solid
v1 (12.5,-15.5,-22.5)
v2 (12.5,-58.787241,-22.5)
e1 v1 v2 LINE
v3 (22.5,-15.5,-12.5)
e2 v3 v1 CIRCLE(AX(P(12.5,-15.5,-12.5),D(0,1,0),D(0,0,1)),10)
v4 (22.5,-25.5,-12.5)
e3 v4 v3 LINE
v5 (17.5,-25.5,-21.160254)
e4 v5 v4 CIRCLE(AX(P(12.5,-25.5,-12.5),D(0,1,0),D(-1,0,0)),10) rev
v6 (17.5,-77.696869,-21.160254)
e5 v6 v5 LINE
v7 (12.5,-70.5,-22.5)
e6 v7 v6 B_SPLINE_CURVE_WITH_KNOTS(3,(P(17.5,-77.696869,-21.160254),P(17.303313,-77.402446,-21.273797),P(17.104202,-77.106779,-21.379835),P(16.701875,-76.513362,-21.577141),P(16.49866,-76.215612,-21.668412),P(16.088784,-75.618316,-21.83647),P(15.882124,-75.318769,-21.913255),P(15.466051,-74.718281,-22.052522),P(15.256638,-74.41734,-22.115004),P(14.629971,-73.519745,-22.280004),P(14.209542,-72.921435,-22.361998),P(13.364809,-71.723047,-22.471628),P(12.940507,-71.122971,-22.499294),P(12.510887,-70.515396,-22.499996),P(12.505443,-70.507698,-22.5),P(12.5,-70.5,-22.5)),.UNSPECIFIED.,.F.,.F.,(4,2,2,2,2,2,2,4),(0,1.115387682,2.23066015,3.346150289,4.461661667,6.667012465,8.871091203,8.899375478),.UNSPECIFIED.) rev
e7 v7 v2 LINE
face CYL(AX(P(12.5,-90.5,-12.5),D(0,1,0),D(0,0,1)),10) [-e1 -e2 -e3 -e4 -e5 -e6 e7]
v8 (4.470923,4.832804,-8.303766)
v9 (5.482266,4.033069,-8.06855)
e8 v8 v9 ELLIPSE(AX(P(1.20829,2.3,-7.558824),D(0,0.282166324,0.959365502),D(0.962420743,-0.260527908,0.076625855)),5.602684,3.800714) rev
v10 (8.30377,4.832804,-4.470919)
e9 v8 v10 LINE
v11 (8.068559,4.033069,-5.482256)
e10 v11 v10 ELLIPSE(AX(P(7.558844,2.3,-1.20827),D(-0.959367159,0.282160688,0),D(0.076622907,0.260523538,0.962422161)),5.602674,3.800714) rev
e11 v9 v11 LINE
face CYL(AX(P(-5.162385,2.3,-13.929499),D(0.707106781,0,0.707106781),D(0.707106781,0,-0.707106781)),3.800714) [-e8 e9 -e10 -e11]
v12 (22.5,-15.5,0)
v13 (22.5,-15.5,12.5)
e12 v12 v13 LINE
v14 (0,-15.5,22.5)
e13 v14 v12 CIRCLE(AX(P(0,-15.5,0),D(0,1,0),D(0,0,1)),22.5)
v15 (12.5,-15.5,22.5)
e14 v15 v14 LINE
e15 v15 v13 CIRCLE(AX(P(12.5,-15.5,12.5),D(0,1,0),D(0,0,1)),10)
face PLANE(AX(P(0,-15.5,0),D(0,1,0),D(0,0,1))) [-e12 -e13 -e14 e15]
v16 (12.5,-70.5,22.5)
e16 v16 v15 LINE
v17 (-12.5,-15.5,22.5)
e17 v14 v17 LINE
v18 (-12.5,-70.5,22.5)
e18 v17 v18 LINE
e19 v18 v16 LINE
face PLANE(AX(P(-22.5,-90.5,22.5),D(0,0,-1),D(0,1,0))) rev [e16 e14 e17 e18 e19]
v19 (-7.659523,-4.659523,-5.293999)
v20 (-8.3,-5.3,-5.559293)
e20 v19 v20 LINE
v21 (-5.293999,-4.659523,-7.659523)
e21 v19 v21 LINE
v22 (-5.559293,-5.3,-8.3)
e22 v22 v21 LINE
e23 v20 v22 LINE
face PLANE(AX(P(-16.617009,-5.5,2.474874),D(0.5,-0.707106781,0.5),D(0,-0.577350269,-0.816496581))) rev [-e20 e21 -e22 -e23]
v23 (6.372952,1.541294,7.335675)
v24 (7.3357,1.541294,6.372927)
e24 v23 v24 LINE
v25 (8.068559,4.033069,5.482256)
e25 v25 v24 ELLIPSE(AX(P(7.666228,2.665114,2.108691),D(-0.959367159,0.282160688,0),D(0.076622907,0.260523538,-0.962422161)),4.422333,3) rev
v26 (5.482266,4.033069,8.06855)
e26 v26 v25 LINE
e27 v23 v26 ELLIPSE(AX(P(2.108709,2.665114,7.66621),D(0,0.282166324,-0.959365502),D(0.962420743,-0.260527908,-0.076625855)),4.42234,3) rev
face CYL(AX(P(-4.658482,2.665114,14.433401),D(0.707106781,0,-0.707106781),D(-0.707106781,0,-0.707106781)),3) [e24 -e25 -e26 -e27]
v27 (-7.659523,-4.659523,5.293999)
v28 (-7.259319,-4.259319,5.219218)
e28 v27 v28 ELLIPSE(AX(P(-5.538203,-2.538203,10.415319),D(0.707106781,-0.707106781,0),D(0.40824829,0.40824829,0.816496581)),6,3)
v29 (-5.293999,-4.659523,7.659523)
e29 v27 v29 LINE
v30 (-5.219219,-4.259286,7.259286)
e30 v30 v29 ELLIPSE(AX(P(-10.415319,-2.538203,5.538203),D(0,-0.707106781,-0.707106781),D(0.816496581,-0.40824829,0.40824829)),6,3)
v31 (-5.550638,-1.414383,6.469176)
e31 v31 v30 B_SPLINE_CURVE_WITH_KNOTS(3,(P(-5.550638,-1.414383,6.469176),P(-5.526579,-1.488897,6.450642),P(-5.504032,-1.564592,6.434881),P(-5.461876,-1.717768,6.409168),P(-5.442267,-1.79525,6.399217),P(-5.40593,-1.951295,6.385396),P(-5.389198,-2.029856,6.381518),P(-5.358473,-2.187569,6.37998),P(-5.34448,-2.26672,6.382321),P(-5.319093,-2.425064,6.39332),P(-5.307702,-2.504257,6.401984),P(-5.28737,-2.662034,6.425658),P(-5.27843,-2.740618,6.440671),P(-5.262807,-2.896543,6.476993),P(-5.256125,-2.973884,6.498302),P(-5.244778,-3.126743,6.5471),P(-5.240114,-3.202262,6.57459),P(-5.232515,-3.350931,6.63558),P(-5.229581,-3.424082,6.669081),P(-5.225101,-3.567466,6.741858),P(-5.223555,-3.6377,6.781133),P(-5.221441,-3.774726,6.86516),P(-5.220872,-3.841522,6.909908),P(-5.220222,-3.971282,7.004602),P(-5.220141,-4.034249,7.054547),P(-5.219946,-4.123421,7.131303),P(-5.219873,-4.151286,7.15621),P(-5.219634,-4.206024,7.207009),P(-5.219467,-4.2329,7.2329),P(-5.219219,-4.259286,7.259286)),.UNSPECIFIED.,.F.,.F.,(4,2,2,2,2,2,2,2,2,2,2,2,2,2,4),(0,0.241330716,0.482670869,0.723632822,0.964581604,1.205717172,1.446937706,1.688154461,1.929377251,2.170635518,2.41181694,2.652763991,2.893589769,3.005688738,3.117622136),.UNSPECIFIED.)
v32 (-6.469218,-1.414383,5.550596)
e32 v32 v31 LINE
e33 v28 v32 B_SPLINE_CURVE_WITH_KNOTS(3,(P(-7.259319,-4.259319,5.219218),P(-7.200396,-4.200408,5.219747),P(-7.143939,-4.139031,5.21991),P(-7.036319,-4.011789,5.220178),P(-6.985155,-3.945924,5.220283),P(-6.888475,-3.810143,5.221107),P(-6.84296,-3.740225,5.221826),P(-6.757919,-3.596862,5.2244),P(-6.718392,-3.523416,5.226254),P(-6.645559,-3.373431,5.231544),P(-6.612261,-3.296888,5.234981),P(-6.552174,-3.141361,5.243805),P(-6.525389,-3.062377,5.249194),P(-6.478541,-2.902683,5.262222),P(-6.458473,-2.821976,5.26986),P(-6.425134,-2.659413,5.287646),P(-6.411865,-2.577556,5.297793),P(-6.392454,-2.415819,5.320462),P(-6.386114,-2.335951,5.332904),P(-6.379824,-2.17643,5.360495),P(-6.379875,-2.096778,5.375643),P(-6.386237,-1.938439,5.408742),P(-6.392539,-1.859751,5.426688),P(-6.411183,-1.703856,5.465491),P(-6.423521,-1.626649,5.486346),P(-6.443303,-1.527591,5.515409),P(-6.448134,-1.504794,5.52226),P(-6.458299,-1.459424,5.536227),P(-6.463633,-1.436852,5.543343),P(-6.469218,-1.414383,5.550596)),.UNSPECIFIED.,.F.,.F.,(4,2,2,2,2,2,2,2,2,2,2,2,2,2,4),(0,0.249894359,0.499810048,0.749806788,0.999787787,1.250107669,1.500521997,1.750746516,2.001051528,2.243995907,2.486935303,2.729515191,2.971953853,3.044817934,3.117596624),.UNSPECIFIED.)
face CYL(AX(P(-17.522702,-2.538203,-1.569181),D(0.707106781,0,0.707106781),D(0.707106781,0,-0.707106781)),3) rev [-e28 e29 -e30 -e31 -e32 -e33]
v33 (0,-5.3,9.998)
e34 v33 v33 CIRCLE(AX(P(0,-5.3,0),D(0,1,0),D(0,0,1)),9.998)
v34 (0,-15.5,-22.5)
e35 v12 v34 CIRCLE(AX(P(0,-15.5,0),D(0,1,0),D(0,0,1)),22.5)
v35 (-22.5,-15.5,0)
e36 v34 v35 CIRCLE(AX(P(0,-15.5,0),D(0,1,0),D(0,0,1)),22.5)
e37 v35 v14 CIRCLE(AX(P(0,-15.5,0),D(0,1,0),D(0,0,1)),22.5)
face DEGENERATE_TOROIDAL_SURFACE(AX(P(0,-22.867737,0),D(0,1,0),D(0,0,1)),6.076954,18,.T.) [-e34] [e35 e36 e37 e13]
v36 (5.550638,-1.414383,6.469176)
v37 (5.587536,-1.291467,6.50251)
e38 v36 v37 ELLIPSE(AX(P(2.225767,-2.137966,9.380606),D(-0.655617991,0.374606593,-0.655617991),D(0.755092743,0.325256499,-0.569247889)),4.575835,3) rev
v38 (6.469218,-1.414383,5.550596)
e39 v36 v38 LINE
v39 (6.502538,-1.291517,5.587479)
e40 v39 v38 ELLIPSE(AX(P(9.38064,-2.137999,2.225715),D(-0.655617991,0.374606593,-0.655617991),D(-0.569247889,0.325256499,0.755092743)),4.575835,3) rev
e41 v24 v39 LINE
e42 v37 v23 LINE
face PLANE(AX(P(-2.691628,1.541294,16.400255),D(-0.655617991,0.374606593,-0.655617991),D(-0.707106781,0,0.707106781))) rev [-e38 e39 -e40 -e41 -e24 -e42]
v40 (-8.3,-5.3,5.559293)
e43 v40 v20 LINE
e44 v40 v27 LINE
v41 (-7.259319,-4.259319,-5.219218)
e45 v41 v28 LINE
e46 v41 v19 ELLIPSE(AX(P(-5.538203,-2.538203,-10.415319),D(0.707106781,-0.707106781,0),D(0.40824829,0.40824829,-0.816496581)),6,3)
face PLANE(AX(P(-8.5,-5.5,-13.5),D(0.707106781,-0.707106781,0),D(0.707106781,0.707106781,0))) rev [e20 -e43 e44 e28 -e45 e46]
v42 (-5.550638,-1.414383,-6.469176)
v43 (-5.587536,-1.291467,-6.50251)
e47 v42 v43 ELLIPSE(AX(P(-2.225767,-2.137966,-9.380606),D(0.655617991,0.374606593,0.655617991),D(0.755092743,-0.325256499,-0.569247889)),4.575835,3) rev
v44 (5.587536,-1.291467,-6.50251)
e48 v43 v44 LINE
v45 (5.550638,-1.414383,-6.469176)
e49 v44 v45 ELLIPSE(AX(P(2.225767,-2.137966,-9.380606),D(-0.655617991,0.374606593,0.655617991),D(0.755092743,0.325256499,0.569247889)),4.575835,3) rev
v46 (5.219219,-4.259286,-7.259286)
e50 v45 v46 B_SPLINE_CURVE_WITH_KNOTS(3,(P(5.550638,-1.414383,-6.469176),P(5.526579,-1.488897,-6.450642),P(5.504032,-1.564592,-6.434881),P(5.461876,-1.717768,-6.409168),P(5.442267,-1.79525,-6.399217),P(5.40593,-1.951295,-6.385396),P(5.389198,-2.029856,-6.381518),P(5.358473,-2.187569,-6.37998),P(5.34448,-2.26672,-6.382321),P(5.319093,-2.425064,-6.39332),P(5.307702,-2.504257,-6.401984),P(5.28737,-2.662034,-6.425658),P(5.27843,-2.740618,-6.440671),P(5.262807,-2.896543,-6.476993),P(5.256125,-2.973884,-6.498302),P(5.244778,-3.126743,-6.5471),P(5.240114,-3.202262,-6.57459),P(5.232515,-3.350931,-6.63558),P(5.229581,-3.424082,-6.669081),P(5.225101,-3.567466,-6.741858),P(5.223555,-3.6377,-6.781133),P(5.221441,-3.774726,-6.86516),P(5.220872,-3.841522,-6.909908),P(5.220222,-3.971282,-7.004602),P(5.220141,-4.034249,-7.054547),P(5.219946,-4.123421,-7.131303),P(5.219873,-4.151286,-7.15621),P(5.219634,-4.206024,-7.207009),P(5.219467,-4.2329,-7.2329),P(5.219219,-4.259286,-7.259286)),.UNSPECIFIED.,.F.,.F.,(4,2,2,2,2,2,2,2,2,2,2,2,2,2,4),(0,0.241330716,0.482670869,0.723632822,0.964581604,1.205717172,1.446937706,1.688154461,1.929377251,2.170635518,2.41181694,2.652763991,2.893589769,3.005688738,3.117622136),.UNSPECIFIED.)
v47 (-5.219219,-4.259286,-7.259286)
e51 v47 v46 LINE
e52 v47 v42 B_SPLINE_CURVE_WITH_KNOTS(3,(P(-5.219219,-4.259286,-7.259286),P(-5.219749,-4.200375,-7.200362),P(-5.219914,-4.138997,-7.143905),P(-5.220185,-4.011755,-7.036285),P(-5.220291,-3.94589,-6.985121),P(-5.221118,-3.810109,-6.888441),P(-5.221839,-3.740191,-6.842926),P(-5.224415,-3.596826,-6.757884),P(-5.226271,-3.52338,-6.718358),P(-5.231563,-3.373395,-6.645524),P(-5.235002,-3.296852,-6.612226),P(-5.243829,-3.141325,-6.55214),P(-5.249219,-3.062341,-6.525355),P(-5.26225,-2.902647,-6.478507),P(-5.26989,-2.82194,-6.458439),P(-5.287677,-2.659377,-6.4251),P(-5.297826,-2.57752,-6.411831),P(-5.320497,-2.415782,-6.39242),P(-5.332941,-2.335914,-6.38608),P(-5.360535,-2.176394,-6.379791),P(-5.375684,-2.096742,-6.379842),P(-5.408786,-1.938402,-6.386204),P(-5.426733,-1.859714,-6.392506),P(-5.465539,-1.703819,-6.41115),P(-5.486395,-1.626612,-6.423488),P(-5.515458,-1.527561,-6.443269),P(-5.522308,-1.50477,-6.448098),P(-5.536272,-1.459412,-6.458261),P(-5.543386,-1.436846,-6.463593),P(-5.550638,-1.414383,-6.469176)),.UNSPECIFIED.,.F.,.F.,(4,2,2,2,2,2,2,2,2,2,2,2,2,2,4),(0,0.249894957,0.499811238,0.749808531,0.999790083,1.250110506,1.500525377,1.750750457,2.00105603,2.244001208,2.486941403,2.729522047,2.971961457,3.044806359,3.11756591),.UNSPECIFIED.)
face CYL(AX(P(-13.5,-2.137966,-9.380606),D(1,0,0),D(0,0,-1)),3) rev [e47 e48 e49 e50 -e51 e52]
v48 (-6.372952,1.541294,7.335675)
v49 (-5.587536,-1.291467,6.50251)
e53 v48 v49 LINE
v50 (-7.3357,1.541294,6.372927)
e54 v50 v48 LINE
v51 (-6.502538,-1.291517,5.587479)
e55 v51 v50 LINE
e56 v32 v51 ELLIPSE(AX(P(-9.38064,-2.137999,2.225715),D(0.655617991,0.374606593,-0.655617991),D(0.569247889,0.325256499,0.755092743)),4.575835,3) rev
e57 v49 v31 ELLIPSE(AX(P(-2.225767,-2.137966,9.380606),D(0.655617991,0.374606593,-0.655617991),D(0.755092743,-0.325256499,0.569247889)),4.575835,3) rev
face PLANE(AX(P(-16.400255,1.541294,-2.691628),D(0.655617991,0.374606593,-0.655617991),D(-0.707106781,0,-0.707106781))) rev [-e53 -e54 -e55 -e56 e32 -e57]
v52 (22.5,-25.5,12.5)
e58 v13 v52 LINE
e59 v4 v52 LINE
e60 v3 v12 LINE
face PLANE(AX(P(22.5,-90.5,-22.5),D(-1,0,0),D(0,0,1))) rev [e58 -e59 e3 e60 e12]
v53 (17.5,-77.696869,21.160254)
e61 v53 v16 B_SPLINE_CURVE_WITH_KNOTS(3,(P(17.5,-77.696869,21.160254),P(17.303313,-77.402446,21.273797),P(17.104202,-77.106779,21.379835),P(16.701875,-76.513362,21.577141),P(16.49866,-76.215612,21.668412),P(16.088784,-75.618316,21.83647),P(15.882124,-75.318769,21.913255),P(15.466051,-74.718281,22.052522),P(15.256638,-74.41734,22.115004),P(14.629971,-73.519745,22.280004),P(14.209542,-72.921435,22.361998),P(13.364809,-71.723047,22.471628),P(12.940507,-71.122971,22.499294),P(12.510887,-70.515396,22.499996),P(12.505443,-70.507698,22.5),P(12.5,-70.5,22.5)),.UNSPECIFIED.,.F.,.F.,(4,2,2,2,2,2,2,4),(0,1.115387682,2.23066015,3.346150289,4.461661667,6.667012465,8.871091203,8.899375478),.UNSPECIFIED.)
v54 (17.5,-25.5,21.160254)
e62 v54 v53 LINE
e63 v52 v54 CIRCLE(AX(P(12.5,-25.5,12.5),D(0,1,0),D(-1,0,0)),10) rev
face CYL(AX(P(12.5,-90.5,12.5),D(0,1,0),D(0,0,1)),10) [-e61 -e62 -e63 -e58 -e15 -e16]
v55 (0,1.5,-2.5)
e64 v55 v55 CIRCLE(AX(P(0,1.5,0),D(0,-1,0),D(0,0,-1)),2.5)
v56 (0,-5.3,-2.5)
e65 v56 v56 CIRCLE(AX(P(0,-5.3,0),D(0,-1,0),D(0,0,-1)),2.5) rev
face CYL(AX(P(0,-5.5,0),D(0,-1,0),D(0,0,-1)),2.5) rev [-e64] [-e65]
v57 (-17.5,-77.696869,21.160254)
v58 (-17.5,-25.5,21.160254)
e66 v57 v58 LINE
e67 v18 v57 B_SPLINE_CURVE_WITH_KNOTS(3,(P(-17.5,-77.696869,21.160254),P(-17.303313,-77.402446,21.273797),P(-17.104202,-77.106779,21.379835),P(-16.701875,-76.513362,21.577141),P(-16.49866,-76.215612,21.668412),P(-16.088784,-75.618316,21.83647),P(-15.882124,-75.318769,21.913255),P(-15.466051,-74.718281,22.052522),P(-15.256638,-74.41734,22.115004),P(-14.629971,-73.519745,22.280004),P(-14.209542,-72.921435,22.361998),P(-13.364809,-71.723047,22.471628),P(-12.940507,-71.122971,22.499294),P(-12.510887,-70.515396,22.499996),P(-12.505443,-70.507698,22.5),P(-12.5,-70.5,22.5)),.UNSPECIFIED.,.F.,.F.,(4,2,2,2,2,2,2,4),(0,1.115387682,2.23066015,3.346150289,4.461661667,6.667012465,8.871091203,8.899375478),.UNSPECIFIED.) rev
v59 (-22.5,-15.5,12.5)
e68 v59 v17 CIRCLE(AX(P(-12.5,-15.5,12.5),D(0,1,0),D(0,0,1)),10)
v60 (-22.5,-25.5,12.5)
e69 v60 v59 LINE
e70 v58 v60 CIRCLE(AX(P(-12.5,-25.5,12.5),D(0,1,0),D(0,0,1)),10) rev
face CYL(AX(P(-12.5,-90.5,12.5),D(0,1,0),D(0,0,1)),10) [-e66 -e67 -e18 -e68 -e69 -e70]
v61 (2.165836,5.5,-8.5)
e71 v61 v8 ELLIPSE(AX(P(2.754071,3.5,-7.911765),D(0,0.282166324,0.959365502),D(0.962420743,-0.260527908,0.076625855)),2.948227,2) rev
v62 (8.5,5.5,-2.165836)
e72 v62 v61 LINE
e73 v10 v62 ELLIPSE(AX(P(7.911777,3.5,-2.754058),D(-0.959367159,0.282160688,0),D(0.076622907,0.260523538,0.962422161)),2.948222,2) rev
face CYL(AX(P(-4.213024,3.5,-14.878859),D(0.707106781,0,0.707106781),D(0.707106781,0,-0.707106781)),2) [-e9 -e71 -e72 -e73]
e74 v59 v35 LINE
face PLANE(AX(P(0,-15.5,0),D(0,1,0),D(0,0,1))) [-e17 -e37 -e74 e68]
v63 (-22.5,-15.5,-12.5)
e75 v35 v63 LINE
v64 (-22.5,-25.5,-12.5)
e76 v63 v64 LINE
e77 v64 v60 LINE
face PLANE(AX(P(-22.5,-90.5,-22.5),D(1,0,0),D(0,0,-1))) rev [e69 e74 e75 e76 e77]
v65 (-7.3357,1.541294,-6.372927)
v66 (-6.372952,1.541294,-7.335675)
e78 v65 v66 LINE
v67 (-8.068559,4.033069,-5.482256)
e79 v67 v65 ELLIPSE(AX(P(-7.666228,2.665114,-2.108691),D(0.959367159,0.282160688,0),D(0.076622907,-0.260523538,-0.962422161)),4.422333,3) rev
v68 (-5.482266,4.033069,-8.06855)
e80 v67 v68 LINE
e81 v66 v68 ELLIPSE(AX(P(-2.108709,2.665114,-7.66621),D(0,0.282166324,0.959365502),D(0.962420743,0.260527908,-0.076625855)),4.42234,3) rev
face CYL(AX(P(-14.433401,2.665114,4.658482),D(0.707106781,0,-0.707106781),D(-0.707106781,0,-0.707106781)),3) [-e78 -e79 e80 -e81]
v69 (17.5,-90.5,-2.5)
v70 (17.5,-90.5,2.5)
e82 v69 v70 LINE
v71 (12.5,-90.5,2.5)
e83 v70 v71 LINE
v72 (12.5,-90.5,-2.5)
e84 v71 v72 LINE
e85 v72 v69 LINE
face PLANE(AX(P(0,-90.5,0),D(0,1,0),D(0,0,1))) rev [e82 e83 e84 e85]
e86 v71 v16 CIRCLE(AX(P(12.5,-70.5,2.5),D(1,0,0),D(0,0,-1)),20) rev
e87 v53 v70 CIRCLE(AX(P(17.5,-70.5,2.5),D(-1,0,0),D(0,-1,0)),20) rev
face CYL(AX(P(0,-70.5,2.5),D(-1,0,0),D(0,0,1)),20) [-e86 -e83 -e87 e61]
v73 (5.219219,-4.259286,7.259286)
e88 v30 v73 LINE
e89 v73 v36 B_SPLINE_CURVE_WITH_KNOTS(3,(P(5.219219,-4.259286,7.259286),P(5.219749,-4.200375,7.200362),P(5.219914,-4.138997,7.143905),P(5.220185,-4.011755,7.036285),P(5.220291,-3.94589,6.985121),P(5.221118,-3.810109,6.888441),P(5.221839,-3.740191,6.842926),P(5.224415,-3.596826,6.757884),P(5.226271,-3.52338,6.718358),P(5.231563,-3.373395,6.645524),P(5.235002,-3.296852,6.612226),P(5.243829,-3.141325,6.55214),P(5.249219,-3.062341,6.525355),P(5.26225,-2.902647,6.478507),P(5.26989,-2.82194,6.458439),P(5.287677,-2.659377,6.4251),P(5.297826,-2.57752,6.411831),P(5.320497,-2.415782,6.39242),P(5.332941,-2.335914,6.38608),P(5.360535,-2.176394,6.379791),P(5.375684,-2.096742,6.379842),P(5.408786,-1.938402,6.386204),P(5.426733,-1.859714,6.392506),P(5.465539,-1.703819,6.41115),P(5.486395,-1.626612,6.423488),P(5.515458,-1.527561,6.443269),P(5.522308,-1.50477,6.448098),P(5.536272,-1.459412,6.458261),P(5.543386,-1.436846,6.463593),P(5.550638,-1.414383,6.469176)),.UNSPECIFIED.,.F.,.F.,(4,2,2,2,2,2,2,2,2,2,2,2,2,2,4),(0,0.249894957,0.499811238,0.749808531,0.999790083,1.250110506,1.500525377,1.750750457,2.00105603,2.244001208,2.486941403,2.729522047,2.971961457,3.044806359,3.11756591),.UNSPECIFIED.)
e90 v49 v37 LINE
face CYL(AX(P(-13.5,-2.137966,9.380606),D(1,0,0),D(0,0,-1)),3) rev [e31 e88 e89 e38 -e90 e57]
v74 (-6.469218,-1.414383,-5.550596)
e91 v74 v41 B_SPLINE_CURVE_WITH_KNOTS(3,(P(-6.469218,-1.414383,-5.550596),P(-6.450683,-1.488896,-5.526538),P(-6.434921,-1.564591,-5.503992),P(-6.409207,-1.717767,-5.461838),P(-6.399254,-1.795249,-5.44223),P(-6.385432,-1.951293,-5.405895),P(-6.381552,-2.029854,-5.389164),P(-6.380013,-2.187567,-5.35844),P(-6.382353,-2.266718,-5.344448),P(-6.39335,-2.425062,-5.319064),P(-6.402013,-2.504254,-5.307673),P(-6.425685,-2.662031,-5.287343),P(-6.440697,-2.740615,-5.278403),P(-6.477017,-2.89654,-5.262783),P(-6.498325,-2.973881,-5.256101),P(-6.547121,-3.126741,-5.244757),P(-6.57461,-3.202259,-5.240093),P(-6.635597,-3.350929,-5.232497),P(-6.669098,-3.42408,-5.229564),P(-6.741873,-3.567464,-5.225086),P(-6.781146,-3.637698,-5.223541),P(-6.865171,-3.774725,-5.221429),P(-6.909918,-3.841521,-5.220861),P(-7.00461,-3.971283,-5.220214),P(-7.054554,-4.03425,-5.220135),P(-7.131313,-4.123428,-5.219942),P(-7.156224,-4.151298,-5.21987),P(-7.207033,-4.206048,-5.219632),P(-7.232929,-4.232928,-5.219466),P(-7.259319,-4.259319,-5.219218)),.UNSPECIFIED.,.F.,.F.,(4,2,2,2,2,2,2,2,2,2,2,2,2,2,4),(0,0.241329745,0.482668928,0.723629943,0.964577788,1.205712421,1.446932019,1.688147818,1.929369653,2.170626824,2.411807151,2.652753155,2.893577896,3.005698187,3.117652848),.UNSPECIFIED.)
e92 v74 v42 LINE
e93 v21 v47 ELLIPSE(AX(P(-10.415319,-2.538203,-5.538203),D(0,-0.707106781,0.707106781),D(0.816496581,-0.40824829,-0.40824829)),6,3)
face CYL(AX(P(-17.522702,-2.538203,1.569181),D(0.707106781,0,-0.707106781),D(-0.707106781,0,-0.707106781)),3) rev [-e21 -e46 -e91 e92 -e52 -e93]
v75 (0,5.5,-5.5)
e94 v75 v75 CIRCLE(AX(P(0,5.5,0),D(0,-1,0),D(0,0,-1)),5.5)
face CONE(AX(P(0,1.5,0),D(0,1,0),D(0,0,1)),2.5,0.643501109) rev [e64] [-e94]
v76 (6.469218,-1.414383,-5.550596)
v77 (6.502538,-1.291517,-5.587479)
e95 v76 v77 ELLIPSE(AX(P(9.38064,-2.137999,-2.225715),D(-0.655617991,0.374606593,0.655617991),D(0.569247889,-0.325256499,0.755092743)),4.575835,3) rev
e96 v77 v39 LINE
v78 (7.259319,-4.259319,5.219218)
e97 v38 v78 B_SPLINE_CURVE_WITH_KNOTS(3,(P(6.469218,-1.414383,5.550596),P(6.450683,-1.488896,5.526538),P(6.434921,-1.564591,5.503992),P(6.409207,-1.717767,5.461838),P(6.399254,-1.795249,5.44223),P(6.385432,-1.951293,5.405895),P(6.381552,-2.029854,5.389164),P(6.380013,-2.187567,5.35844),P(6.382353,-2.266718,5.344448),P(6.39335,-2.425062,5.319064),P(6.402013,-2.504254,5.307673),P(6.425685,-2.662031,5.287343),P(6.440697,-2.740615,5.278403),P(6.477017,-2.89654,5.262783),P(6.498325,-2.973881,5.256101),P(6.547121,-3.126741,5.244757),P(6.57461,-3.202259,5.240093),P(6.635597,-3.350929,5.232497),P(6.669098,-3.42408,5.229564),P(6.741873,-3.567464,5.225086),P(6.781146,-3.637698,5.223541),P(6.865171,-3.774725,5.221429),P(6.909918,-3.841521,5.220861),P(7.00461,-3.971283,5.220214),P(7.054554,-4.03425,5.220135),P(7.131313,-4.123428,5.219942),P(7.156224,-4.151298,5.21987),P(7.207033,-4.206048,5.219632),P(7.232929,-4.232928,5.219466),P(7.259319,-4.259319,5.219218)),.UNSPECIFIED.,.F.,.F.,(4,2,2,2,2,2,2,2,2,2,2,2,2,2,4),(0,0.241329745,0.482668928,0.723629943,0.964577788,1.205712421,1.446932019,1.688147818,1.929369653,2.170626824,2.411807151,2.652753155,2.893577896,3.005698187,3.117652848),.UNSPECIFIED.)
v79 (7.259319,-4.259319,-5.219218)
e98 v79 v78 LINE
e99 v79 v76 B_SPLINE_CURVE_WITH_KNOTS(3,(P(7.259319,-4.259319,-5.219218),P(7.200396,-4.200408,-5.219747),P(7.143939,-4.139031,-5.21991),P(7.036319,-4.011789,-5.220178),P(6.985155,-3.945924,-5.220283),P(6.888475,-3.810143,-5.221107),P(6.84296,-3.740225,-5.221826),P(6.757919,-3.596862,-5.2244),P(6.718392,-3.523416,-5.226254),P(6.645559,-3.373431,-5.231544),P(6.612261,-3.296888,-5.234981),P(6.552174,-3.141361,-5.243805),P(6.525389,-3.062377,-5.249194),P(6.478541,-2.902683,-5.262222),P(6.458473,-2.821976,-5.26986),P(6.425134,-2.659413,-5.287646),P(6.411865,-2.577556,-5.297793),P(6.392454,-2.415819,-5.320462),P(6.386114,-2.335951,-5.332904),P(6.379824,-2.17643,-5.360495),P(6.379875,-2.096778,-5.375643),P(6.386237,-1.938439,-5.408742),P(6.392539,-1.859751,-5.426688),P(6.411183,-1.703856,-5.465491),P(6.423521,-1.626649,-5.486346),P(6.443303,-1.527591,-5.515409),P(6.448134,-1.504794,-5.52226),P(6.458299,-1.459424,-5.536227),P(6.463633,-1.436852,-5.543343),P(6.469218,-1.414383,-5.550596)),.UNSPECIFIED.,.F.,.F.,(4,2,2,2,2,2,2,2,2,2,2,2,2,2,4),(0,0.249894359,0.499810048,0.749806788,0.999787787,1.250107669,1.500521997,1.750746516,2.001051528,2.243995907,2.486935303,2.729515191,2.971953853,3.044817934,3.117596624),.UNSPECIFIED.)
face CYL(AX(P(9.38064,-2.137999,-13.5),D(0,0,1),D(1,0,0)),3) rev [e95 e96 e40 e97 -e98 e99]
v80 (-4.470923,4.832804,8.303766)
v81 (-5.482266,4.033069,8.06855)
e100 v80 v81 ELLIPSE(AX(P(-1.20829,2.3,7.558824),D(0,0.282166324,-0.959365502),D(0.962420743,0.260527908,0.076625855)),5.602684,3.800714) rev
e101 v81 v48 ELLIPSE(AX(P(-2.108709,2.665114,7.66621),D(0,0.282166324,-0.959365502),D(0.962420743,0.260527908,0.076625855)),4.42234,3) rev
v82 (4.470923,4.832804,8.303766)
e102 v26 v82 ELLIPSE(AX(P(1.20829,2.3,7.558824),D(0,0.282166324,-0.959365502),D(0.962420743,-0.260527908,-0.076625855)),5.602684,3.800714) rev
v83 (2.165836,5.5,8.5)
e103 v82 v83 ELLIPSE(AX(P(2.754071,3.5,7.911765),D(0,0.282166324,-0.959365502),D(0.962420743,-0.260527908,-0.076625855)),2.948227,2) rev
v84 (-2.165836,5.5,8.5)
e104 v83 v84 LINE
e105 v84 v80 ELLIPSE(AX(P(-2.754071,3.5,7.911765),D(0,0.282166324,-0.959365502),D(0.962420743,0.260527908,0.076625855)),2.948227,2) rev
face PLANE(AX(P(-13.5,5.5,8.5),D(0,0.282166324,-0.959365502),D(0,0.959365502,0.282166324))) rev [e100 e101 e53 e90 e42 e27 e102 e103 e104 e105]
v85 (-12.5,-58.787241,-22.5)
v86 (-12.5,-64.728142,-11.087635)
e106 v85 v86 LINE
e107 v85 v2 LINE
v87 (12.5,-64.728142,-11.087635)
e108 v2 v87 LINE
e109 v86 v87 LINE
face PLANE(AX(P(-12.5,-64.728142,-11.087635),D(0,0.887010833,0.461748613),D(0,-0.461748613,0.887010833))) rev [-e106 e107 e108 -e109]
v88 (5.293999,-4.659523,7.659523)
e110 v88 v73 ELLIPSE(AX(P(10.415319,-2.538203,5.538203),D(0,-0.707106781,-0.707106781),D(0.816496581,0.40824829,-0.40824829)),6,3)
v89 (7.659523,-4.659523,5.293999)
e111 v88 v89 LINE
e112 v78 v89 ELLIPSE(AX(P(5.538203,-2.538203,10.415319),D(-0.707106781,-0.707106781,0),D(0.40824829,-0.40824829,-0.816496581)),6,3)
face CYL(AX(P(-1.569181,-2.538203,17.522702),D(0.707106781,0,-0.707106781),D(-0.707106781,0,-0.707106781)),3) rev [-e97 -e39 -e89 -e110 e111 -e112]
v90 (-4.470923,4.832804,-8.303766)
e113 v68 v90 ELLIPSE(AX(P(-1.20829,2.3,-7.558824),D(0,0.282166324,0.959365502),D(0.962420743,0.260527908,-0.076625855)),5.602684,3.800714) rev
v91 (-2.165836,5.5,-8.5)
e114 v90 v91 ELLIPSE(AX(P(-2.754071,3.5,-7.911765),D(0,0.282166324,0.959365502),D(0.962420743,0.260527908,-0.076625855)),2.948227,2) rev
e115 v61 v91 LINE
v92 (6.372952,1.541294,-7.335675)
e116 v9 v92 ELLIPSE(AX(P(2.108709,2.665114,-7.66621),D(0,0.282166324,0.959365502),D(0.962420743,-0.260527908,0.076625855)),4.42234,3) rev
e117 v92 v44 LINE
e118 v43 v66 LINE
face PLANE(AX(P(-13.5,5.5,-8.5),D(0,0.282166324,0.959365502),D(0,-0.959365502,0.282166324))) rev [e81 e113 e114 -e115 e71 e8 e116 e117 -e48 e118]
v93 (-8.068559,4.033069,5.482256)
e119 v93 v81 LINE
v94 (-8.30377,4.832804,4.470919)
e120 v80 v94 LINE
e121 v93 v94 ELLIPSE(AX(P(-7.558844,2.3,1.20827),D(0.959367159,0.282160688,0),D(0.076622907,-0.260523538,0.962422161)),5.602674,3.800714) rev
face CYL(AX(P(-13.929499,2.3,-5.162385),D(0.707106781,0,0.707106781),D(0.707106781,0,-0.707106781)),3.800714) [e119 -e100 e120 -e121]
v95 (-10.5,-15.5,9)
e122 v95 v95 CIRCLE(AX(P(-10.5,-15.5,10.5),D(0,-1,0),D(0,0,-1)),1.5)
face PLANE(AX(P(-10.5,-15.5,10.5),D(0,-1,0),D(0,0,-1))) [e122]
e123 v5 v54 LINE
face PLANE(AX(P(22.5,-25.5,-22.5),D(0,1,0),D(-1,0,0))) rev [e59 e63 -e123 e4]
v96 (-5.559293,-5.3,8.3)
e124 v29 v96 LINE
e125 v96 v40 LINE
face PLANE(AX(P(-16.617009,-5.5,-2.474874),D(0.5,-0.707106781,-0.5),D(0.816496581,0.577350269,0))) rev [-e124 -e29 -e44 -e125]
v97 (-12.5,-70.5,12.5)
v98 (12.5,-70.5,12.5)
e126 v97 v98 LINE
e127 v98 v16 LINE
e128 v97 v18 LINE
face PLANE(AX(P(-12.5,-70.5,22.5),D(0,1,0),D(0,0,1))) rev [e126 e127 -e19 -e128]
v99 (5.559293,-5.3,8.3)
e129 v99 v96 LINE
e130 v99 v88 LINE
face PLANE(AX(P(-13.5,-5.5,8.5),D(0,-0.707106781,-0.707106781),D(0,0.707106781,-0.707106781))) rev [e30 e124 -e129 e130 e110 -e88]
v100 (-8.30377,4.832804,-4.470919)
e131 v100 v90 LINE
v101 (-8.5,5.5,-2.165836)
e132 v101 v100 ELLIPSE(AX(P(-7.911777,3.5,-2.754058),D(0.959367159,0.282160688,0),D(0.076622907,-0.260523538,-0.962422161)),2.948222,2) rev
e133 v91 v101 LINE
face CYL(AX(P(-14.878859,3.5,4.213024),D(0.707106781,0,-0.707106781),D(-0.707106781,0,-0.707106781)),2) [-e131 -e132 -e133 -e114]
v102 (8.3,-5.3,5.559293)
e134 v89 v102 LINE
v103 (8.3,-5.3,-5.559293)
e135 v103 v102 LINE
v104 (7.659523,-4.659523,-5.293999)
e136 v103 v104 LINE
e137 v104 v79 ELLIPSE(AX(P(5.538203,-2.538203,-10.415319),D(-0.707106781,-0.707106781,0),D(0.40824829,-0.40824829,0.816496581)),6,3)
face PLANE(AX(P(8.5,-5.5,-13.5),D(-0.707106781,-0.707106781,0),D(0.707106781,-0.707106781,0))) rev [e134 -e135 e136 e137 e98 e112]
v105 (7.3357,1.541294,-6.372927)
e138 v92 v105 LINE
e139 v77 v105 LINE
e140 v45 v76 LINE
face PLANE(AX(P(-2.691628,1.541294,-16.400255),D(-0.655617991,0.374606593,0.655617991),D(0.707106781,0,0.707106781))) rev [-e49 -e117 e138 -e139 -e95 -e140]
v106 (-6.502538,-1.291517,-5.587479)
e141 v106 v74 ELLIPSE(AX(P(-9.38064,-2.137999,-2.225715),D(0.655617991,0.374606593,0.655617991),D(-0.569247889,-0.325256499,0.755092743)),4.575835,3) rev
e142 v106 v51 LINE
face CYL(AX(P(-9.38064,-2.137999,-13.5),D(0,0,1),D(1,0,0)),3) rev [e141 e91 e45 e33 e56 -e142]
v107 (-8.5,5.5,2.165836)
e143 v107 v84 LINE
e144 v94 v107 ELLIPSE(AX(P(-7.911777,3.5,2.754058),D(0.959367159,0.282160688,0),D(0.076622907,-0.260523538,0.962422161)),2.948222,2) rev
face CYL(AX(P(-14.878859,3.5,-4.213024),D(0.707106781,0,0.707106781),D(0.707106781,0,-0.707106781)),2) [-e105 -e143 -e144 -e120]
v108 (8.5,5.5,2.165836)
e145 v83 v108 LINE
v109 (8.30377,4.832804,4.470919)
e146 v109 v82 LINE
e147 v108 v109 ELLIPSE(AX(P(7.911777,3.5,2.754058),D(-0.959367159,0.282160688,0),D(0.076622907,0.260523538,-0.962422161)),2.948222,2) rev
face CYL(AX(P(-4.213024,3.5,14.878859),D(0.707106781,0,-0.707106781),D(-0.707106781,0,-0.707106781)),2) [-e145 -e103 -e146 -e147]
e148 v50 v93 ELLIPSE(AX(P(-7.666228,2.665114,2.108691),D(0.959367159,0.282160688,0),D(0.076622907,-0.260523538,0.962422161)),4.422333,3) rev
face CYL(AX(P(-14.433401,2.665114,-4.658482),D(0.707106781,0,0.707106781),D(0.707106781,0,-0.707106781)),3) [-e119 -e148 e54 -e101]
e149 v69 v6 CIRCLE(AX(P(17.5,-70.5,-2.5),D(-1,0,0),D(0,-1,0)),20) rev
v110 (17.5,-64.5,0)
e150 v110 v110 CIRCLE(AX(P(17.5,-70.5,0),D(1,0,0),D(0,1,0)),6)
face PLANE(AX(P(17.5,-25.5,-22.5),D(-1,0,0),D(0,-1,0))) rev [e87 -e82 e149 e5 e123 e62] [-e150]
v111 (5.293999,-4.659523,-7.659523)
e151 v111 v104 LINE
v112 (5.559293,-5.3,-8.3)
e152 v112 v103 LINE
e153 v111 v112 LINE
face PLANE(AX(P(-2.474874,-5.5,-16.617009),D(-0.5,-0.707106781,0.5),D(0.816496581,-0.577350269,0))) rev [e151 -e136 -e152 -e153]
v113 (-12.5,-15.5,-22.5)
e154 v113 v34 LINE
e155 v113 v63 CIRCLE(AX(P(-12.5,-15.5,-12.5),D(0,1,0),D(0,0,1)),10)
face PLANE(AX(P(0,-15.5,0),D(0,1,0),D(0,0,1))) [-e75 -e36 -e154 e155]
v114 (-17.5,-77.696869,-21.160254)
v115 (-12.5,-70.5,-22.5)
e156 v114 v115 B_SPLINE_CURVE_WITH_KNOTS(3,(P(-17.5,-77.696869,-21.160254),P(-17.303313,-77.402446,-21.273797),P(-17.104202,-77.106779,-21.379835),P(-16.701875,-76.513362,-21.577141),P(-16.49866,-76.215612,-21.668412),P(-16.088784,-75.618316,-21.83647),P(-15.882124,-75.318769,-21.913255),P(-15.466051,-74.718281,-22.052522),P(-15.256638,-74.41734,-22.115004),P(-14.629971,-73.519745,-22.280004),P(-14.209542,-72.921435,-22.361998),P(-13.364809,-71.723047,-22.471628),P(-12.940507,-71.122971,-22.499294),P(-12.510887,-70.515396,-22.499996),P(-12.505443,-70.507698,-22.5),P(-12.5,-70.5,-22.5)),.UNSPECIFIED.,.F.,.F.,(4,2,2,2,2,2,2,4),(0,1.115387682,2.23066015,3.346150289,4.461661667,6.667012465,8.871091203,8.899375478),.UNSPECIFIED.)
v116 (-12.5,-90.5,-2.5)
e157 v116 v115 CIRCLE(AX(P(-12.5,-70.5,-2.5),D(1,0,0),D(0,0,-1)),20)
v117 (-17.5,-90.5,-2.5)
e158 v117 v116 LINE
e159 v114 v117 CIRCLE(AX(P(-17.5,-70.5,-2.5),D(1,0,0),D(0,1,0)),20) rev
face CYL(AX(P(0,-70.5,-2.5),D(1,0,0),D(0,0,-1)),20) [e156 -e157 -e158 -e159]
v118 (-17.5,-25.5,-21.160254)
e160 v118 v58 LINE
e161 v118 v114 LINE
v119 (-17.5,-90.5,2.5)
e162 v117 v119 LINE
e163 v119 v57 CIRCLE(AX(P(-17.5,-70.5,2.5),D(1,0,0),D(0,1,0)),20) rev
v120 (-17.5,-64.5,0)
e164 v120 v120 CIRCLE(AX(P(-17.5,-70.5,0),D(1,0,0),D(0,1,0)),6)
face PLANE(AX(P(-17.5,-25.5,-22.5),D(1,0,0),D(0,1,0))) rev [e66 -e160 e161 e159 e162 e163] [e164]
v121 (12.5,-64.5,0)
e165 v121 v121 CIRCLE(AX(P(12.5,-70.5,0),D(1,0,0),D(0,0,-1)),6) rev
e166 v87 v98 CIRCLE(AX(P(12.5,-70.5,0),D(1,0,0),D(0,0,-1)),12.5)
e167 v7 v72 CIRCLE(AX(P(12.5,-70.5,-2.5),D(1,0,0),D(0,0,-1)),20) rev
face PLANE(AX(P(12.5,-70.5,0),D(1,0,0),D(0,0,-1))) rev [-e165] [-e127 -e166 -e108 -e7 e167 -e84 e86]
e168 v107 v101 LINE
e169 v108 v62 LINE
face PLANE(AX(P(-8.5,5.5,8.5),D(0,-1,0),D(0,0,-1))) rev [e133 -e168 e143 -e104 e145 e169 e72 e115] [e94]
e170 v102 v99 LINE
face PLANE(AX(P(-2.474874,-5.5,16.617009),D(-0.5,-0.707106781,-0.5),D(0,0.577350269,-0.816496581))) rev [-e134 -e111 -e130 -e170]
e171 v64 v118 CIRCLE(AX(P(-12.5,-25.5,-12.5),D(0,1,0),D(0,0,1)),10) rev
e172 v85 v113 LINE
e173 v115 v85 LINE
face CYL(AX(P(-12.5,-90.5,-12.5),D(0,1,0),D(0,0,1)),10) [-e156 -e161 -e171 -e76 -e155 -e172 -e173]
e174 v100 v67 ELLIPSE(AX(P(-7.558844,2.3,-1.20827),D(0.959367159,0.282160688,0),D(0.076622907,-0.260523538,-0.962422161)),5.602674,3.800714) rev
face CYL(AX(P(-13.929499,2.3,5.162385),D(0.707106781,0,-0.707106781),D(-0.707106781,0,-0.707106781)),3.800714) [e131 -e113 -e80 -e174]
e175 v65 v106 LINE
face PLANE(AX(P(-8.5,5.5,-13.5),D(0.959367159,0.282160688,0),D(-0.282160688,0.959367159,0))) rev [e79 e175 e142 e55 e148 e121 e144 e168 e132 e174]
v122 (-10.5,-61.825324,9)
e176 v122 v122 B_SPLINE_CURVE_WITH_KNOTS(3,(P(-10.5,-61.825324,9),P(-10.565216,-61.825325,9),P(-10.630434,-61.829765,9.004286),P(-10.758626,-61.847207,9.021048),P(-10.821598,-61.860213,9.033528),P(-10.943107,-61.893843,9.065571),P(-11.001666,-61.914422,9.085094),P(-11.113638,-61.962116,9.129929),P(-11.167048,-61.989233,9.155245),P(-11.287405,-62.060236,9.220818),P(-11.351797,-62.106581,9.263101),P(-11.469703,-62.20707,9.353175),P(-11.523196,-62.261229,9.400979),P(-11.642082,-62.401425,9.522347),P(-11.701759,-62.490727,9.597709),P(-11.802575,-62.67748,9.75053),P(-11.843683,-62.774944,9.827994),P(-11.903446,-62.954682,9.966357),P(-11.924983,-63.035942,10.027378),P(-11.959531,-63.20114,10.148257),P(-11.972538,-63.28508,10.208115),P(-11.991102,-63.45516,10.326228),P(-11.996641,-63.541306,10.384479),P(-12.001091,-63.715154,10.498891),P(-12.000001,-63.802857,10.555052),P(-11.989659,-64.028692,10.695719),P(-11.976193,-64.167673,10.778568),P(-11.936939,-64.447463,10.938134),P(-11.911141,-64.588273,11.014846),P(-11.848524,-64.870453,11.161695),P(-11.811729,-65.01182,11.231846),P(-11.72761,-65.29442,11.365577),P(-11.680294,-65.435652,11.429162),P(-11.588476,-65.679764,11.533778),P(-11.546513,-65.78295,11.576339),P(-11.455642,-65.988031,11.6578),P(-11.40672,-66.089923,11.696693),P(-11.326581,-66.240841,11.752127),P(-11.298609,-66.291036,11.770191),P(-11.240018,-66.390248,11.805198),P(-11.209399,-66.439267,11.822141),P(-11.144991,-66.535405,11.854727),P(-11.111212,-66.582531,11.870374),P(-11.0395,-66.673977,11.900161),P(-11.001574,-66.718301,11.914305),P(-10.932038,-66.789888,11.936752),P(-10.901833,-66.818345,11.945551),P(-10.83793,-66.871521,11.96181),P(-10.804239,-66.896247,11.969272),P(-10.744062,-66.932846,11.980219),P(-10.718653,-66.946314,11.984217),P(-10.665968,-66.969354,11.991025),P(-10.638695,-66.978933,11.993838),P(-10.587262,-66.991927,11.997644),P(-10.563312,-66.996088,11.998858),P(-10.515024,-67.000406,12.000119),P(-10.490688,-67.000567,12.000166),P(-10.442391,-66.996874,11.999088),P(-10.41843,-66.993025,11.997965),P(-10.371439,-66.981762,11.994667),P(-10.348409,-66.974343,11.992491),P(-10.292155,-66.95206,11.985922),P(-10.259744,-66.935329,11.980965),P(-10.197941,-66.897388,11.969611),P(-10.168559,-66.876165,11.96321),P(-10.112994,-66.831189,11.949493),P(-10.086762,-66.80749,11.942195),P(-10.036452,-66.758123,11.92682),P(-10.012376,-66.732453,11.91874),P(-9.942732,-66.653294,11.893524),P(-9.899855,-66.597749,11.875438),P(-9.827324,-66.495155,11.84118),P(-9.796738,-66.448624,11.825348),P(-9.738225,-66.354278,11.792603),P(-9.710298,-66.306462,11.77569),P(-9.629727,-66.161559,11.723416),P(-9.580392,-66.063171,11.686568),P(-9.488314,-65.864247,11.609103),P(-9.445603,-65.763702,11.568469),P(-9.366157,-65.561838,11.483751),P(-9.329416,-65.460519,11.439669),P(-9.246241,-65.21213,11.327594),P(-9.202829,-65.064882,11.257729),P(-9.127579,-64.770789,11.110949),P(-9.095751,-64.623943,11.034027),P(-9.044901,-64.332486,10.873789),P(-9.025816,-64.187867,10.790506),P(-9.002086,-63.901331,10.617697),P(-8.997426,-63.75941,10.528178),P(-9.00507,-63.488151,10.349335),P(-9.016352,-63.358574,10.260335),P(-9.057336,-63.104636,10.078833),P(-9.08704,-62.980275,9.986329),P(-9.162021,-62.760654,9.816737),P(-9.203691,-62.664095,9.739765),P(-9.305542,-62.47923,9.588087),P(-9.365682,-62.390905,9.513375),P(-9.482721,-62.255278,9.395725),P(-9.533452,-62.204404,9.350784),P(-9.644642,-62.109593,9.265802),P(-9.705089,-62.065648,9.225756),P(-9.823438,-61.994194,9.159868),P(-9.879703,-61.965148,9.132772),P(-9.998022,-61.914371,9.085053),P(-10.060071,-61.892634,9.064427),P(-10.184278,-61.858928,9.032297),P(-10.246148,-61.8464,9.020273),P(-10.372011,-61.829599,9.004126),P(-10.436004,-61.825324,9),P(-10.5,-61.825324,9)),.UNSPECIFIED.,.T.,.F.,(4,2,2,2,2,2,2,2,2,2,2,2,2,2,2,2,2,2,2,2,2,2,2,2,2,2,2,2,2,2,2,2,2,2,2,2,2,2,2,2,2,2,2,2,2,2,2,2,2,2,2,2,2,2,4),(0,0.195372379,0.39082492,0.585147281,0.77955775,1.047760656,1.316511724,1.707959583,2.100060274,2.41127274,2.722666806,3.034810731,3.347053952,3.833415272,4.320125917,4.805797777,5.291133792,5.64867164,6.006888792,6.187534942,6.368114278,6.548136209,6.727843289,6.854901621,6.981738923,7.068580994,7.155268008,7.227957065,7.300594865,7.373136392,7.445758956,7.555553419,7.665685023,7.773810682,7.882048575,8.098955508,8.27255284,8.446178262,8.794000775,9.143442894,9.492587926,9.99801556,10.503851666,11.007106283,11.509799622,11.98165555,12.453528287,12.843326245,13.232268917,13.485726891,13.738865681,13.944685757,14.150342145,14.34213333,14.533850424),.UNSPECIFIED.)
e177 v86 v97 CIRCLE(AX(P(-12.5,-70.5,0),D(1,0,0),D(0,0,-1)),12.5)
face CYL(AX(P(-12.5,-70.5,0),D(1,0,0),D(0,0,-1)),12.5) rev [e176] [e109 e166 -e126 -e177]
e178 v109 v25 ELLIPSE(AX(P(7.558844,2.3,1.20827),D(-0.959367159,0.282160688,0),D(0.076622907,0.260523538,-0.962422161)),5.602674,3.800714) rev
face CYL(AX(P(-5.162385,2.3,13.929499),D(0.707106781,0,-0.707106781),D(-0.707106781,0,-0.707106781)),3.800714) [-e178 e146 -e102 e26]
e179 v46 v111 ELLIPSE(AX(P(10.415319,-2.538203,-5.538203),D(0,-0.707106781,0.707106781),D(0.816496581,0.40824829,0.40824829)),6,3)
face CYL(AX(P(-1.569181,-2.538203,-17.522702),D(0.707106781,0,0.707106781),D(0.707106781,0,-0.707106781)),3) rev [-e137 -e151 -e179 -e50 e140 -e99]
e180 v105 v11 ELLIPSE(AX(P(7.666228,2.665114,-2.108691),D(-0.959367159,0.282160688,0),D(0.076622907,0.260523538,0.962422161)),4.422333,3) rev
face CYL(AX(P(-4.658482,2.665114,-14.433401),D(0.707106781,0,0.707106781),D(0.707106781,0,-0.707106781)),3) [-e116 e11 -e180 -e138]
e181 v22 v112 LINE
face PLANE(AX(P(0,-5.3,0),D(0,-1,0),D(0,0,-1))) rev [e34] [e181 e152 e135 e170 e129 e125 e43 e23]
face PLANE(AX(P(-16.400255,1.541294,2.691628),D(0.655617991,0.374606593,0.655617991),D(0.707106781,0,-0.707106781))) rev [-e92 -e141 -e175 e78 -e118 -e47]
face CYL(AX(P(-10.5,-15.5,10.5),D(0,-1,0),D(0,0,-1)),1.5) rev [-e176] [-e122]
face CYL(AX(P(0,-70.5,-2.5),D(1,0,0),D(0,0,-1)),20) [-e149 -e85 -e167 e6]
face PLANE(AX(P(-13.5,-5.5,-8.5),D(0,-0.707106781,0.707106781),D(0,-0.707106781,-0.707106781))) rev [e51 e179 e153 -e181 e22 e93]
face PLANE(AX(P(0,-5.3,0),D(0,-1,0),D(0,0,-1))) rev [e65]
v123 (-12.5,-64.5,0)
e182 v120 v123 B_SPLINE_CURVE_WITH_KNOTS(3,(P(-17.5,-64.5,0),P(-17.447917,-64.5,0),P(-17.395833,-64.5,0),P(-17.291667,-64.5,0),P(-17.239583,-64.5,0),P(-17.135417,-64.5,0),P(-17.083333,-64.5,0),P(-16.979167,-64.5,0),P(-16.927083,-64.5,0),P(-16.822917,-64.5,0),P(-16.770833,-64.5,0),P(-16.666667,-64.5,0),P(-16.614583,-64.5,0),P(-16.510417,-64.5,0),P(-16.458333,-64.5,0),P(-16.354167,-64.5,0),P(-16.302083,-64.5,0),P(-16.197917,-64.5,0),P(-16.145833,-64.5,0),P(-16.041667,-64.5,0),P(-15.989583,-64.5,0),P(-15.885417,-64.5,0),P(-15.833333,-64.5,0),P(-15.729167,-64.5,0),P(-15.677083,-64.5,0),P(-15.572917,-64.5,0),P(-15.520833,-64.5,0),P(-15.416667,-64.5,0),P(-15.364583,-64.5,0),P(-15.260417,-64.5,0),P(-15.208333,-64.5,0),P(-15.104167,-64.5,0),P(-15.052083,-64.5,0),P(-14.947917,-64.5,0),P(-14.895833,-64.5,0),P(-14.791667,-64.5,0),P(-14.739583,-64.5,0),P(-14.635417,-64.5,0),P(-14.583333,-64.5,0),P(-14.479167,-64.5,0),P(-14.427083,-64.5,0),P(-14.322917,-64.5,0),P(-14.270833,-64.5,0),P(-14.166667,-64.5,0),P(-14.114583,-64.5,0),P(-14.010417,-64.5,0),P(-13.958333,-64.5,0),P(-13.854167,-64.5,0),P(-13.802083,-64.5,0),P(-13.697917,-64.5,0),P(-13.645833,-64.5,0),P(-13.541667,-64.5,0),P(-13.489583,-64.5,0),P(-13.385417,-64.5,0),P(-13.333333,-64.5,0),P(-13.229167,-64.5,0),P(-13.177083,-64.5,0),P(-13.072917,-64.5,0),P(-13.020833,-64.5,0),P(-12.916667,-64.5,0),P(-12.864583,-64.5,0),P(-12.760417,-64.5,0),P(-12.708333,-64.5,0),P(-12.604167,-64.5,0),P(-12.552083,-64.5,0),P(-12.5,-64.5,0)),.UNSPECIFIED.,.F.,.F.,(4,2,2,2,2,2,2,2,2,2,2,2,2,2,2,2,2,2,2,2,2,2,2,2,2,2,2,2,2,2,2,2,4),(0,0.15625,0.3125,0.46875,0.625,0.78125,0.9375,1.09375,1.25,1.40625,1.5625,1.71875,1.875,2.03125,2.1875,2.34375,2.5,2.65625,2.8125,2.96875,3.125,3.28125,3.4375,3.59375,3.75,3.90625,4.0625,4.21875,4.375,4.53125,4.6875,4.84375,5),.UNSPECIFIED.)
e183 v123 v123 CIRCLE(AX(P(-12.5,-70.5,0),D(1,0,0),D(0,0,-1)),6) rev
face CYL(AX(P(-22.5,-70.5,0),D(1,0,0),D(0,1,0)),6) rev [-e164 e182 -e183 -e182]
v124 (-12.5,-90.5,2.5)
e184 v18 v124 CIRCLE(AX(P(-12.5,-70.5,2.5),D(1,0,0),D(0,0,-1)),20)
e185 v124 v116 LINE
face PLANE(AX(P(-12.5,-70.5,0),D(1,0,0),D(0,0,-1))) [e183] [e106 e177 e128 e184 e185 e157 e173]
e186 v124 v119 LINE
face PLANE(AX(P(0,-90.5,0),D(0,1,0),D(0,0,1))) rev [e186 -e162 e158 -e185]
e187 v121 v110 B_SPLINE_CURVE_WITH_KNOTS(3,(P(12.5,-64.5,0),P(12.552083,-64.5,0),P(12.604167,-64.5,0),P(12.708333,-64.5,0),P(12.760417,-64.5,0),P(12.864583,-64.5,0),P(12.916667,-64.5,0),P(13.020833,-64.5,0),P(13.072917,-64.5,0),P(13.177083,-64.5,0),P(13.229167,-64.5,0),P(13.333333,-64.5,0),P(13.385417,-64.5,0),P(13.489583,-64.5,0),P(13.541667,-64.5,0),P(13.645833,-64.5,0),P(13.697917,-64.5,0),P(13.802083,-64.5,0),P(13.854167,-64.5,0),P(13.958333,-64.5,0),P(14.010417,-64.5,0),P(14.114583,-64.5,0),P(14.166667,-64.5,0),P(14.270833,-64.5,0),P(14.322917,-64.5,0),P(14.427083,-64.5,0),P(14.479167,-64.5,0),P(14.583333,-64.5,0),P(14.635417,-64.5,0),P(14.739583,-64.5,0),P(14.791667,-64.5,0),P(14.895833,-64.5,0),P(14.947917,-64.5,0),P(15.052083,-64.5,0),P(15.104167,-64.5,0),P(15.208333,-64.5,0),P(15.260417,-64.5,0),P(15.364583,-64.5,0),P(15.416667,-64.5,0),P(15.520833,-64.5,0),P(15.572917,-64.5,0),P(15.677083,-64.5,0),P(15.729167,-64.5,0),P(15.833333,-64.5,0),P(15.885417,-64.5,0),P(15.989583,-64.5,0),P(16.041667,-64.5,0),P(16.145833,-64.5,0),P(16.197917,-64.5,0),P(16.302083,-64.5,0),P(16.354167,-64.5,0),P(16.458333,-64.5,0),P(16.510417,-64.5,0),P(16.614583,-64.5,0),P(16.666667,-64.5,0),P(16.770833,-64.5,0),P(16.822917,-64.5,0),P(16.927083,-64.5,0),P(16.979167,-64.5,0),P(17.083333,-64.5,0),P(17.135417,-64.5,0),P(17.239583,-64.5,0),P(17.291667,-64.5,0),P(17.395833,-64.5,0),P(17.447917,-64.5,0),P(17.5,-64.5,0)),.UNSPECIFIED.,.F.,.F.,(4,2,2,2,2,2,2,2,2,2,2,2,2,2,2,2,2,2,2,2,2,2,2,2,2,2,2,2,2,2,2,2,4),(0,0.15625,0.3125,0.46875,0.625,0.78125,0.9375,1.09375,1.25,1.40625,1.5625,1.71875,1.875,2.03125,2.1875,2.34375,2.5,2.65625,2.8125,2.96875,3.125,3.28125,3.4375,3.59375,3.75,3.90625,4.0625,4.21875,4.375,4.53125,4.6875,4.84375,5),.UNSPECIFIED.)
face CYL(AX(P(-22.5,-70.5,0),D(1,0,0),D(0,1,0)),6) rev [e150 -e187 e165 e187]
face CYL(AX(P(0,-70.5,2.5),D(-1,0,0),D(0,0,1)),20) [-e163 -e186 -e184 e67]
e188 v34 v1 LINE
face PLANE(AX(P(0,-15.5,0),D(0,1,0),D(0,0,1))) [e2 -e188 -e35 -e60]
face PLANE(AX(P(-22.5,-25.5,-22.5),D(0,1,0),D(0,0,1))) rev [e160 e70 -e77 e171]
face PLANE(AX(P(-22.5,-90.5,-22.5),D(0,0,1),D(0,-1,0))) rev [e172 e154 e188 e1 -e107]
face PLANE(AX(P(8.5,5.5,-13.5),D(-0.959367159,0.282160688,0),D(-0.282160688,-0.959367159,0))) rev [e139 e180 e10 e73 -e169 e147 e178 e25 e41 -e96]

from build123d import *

# Parameters (mm, degrees)
SKETCH4_W           = 17
SKETCH4_H           = 11
BOSS_EXTRUDE2_DEPTH = 8.5
CUT_EXTRUDE1_DEPTH  = 13.5
CUT_EXTRUDE2_DEPTH  = 13.5
CUT_EXTRUDE3_DEPTH  = 13.5
CUT_EXTRUDE4_DEPTH  = 13.5
FILLET1_R           = 2
SKETCH16_W          = 45
SKETCH16_H          = 45
BOSS_EXTRUDE3_DEPTH = 75
SKETCH17_W          = 5
SKETCH17_H          = 65
CUT_EXTRUDE5_DEPTH  = 104.544676
SKETCH18_R          = 6
CUT_EXTRUDE6_DEPTH  = 102.471671
CUT_EXTRUDE7_DEPTH  = 12.5
SKETCH20_R          = 1.5
CUT_EXTRUDE8_DEPTH  = 75
FILLET2_R           = 20
FILLET3_START       = -90.5
FILLET3_DEPTH       = 75


with BuildPart() as part:
    # Sketch4 → Boss-Extrude2 (new, symmetric)
    with BuildSketch(Plane.XY):
        Rectangle(SKETCH4_W, SKETCH4_H)
    extrude(amount=BOSS_EXTRUDE2_DEPTH, both=True)

    # Sketch5 → Cut-Extrude1 (cut, symmetric)
    with BuildSketch(Plane(origin=(0, 0, 0), x_dir=(0, 0, -1), z_dir=(1, 0, 0))):
        with BuildLine():
            Line((8.5, 5.5), (6.50251, -1.291467))
            ThreePointArc((6.50251, -1.291467), (6.473627, -2.879228), (7.259286, -4.259286))
            Line((7.259286, -4.259286), (8.5, -5.5))
            Line((8.5, -5.5), (8.5, 5.5))
        make_face()
        with BuildLine():
            Line((-8.5, -5.5), (-7.259286, -4.259286))
            ThreePointArc((-7.259286, -4.259286), (-6.473627, -2.879228), (-6.50251, -1.291467))
            Line((-6.50251, -1.291467), (-8.5, 5.5))
            Line((-8.5, 5.5), (-8.5, -5.5))
        make_face()
    extrude(amount=CUT_EXTRUDE1_DEPTH, both=True, mode=Mode.SUBTRACT)

    # Sketch7 → Cut-Extrude2 (cut, symmetric)
    with BuildSketch(Plane.XY):
        with BuildLine():
            Line((8.5, 5.5), (6.502538, -1.291517))
            ThreePointArc((6.502538, -1.291517), (6.473662, -2.87927), (7.259319, -4.259319))
            Line((7.259319, -4.259319), (8.5, -5.5))
            Line((8.5, -5.5), (8.5, 5.5))
        make_face()
        with BuildLine():
            Line((-8.5, -5.5), (-7.259319, -4.259319))
            ThreePointArc((-7.259319, -4.259319), (-6.473662, -2.87927), (-6.502538, -1.291517))
            Line((-6.502538, -1.291517), (-8.5, 5.5))
            Line((-8.5, 5.5), (-8.5, -5.5))
        make_face()
    extrude(amount=CUT_EXTRUDE2_DEPTH, both=True, mode=Mode.SUBTRACT)

    # Sketch11 → Cut-Extrude3 (cut, symmetric)
    with BuildSketch(Plane(origin=(0, 0, 0), x_dir=(0.7071067811865509, 0, -0.7071067811865441), z_dir=(0.7071067811865441, 0, 0.7071067811865509))):
        with BuildLine():
            Line((10, -5.5), (9.159523, -4.659523))
            ThreePointArc((9.159523, -4.659523), (8.341069, -3.136307), (8.499292, -1.414383))
            Line((8.499292, -1.414383), (9.693463, 1.541294))
            ThreePointArc((9.693463, 1.541294), (9.908908, 2.799329), (9.581873, 4.033069))
            ThreePointArc((9.581873, 4.033069), (9.013209, 4.854851), (8.25, 5.5))
            Line((8.25, 5.5), (14, 5.5))
            Line((14, 5.5), (14, -5.5))
            Line((14, -5.5), (10, -5.5))
        make_face()
        with BuildLine():
            Line((-14, 5.5), (-8.25, 5.5))
            ThreePointArc((-8.25, 5.5), (-9.013209, 4.854851), (-9.581873, 4.033069))
            ThreePointArc((-9.581873, 4.033069), (-9.908908, 2.799329), (-9.693463, 1.541294))
            Line((-9.693463, 1.541294), (-8.499292, -1.414383))
            ThreePointArc((-8.499292, -1.414383), (-8.341069, -3.136307), (-9.159523, -4.659523))
            Line((-9.159523, -4.659523), (-10, -5.5))
            Line((-10, -5.5), (-14, -5.5))
            Line((-14, -5.5), (-14, 5.5))
        make_face()
    extrude(amount=CUT_EXTRUDE3_DEPTH, both=True, mode=Mode.SUBTRACT)

    # Sketch12 → Cut-Extrude4 (cut, symmetric)
    with BuildSketch(Plane(origin=(0, 0, 0), x_dir=(-0.7071067811865465, 0, -0.7071067811865486), z_dir=(0.7071067811865486, 0, -0.7071067811865465))):
        with BuildLine():
            Line((10, -5.5), (9.159523, -4.659523))
            ThreePointArc((9.159523, -4.659523), (8.341069, -3.136307), (8.499292, -1.414383))
            Line((8.499292, -1.414383), (9.693463, 1.541294))
            ThreePointArc((9.693463, 1.541294), (9.908908, 2.799329), (9.581873, 4.033069))
            ThreePointArc((9.581873, 4.033069), (9.013209, 4.854851), (8.25, 5.5))
            Line((8.25, 5.5), (14, 5.5))
            Line((14, 5.5), (14, -5.5))
            Line((14, -5.5), (10, -5.5))
        make_face()
        with BuildLine():
            Line((-14, 5.5), (-8.25, 5.5))
            ThreePointArc((-8.25, 5.5), (-9.013209, 4.854851), (-9.581873, 4.033069))
            ThreePointArc((-9.581873, 4.033069), (-9.908908, 2.799329), (-9.693463, 1.541294))
            Line((-9.693463, 1.541294), (-8.499292, -1.414383))
            ThreePointArc((-8.499292, -1.414383), (-8.341069, -3.136307), (-9.159523, -4.659523))
            Line((-9.159523, -4.659523), (-10, -5.5))
            Line((-10, -5.5), (-14, -5.5))
            Line((-14, -5.5), (-14, 5.5))
        make_face()
    extrude(amount=CUT_EXTRUDE4_DEPTH, both=True, mode=Mode.SUBTRACT)

    # Sketch14 → Cut-Revolve1 (revolve, cut)
    with BuildSketch(Plane.XY, mode=Mode.PRIVATE) as cut_revolve1_sk:
        Polygon((0, 5.5), (5.5, 5.5), (2.5, 1.5), (2.5, -5.5), (0, -5.5), align=None)
    revolve(cut_revolve1_sk.sketch.rotate(Axis((0, -5.5, 0), (0, 1, 0)), 90), axis=Axis((0, -5.5, 0), (0, 1, 0)), mode=Mode.SUBTRACT)

    # Fillet1
    fillet1_edges = [part.edges().sort_by_distance(p)[0] for p in [
        (5.833631, 5.5, -5.833631),
        (-5.833631, 5.5, -5.833631),
        (-5.833631, 5.5, 5.833631),
        (5.833631, 5.5, 5.833631),
    ]]
    fillet(fillet1_edges, radius=FILLET1_R)

    # Sketch15 → Revolve1 (revolve)
    with BuildSketch(Plane(origin=(0, 0, 0), x_dir=(0, 0, -1), z_dir=(1, 0, 0))):
        with BuildLine():
            Line((0, -15.5), (22.5, -15.5))
            ThreePointArc((22.5, -15.5), (17.455905, -8.920713), (9.998, -5.3))
            Line((9.998, -5.3), (0, -5.3))
            Line((0, -5.3), (0, -5.5))
            Line((0, -5.5), (0, -15.5))
        make_face()
    revolve(axis=Axis((0, -5.5, 0), (0, -1, 0)))

    # Sketch16 → Boss-Extrude3 (add)
    with BuildSketch(Plane.XZ.offset(15.5)):
        Rectangle(SKETCH16_W, SKETCH16_H)
    extrude(amount=BOSS_EXTRUDE3_DEPTH)

    # Sketch17 → Cut-Extrude5 (cut, through all)
    with BuildSketch(Plane.XY.offset(22.5)):
        with Locations((-20, -58)):
            Rectangle(SKETCH17_W, SKETCH17_H)
        with Locations((20, -58)):
            Rectangle(SKETCH17_W, SKETCH17_H)
    extrude(amount=-CUT_EXTRUDE5_DEPTH, mode=Mode.SUBTRACT)

    # Sketch18 → Cut-Extrude6 (cut, through all)
    with BuildSketch(Plane(origin=(17.5, 0, 0), x_dir=(0, 0, -1), z_dir=(1, 0, 0))):
        with Locations(Location((0, -70.5, 0), (0, 0, 90))):
            Circle(SKETCH18_R)
    extrude(amount=-CUT_EXTRUDE6_DEPTH, mode=Mode.SUBTRACT)

    # Sketch19 → Cut-Extrude7 (cut, symmetric)
    with BuildSketch(Plane(origin=(0, 0, 0), x_dir=(0, 0, -1), z_dir=(1, 0, 0))):
        with BuildLine():
            Line((-22.5, -90.5), (-22.5, -70.5))
            Line((-22.5, -70.5), (-12.5, -70.5))
            ThreePointArc((-12.5, -70.5), (-2.971074, -58.358224), (11.087635, -64.728142))
            Line((11.087635, -64.728142), (22.5, -58.787241))
            Line((22.5, -58.787241), (22.5, -90.5))
            Line((22.5, -90.5), (-22.5, -90.5))
        make_face()
    extrude(amount=CUT_EXTRUDE7_DEPTH, both=True, mode=Mode.SUBTRACT)

    # Sketch20 → Cut-Extrude8 (cut)
    with BuildSketch(Plane.XZ.offset(90.5)):
        with Locations(Location((-10.5, 10.5, 0), (0, 0, 270))):
            Circle(SKETCH20_R)
    extrude(amount=-CUT_EXTRUDE8_DEPTH, mode=Mode.SUBTRACT)

    # Fillet2
    fillet2_edges = [part.edges().sort_by_distance(p)[0] for p in [
        (-15, -90.5, -22.5),
        (15, -90.5, -22.5),
        (-15, -90.5, 22.5),
        (15, -90.5, 22.5),
    ]]
    fillet(fillet2_edges, radius=FILLET2_R)

    # Fillet3: read off the stored shape, not the designer's step
    # Fillet3 outline → Fillet3 (cut)
    with BuildSketch(Plane(origin=(0, 0, 0), x_dir=(1, 0, 0), z_dir=(0, 1, 0)).offset(FILLET3_START)):
        with BuildLine():
            ThreePointArc((22.5, -12.5), (19.571068, -19.571068), (12.5, -22.5))
            Line((12.5, -22.5), (22.5, -22.5))
            Line((22.5, -22.5), (22.5, -12.5))
        make_face()
        with BuildLine():
            Line((-22.5, -22.5), (-12.5, -22.5))
            ThreePointArc((-12.5, -22.5), (-19.571068, -19.571068), (-22.5, -12.5))
            Line((-22.5, -12.5), (-22.5, -22.5))
        make_face()
        with BuildLine():
            ThreePointArc((12.5, 22.5), (19.571068, 19.571068), (22.5, 12.5))
            Line((22.5, 12.5), (22.5, 22.5))
            Line((22.5, 22.5), (12.5, 22.5))
        make_face()
        with BuildLine():
            Line((-22.5, 22.5), (-22.5, 12.5))
            ThreePointArc((-22.5, 12.5), (-19.571068, 19.571068), (-12.5, 22.5))
            Line((-12.5, 22.5), (-22.5, 22.5))
        make_face()
    extrude(amount=FILLET3_DEPTH, mode=Mode.SUBTRACT)


solid = part.part
